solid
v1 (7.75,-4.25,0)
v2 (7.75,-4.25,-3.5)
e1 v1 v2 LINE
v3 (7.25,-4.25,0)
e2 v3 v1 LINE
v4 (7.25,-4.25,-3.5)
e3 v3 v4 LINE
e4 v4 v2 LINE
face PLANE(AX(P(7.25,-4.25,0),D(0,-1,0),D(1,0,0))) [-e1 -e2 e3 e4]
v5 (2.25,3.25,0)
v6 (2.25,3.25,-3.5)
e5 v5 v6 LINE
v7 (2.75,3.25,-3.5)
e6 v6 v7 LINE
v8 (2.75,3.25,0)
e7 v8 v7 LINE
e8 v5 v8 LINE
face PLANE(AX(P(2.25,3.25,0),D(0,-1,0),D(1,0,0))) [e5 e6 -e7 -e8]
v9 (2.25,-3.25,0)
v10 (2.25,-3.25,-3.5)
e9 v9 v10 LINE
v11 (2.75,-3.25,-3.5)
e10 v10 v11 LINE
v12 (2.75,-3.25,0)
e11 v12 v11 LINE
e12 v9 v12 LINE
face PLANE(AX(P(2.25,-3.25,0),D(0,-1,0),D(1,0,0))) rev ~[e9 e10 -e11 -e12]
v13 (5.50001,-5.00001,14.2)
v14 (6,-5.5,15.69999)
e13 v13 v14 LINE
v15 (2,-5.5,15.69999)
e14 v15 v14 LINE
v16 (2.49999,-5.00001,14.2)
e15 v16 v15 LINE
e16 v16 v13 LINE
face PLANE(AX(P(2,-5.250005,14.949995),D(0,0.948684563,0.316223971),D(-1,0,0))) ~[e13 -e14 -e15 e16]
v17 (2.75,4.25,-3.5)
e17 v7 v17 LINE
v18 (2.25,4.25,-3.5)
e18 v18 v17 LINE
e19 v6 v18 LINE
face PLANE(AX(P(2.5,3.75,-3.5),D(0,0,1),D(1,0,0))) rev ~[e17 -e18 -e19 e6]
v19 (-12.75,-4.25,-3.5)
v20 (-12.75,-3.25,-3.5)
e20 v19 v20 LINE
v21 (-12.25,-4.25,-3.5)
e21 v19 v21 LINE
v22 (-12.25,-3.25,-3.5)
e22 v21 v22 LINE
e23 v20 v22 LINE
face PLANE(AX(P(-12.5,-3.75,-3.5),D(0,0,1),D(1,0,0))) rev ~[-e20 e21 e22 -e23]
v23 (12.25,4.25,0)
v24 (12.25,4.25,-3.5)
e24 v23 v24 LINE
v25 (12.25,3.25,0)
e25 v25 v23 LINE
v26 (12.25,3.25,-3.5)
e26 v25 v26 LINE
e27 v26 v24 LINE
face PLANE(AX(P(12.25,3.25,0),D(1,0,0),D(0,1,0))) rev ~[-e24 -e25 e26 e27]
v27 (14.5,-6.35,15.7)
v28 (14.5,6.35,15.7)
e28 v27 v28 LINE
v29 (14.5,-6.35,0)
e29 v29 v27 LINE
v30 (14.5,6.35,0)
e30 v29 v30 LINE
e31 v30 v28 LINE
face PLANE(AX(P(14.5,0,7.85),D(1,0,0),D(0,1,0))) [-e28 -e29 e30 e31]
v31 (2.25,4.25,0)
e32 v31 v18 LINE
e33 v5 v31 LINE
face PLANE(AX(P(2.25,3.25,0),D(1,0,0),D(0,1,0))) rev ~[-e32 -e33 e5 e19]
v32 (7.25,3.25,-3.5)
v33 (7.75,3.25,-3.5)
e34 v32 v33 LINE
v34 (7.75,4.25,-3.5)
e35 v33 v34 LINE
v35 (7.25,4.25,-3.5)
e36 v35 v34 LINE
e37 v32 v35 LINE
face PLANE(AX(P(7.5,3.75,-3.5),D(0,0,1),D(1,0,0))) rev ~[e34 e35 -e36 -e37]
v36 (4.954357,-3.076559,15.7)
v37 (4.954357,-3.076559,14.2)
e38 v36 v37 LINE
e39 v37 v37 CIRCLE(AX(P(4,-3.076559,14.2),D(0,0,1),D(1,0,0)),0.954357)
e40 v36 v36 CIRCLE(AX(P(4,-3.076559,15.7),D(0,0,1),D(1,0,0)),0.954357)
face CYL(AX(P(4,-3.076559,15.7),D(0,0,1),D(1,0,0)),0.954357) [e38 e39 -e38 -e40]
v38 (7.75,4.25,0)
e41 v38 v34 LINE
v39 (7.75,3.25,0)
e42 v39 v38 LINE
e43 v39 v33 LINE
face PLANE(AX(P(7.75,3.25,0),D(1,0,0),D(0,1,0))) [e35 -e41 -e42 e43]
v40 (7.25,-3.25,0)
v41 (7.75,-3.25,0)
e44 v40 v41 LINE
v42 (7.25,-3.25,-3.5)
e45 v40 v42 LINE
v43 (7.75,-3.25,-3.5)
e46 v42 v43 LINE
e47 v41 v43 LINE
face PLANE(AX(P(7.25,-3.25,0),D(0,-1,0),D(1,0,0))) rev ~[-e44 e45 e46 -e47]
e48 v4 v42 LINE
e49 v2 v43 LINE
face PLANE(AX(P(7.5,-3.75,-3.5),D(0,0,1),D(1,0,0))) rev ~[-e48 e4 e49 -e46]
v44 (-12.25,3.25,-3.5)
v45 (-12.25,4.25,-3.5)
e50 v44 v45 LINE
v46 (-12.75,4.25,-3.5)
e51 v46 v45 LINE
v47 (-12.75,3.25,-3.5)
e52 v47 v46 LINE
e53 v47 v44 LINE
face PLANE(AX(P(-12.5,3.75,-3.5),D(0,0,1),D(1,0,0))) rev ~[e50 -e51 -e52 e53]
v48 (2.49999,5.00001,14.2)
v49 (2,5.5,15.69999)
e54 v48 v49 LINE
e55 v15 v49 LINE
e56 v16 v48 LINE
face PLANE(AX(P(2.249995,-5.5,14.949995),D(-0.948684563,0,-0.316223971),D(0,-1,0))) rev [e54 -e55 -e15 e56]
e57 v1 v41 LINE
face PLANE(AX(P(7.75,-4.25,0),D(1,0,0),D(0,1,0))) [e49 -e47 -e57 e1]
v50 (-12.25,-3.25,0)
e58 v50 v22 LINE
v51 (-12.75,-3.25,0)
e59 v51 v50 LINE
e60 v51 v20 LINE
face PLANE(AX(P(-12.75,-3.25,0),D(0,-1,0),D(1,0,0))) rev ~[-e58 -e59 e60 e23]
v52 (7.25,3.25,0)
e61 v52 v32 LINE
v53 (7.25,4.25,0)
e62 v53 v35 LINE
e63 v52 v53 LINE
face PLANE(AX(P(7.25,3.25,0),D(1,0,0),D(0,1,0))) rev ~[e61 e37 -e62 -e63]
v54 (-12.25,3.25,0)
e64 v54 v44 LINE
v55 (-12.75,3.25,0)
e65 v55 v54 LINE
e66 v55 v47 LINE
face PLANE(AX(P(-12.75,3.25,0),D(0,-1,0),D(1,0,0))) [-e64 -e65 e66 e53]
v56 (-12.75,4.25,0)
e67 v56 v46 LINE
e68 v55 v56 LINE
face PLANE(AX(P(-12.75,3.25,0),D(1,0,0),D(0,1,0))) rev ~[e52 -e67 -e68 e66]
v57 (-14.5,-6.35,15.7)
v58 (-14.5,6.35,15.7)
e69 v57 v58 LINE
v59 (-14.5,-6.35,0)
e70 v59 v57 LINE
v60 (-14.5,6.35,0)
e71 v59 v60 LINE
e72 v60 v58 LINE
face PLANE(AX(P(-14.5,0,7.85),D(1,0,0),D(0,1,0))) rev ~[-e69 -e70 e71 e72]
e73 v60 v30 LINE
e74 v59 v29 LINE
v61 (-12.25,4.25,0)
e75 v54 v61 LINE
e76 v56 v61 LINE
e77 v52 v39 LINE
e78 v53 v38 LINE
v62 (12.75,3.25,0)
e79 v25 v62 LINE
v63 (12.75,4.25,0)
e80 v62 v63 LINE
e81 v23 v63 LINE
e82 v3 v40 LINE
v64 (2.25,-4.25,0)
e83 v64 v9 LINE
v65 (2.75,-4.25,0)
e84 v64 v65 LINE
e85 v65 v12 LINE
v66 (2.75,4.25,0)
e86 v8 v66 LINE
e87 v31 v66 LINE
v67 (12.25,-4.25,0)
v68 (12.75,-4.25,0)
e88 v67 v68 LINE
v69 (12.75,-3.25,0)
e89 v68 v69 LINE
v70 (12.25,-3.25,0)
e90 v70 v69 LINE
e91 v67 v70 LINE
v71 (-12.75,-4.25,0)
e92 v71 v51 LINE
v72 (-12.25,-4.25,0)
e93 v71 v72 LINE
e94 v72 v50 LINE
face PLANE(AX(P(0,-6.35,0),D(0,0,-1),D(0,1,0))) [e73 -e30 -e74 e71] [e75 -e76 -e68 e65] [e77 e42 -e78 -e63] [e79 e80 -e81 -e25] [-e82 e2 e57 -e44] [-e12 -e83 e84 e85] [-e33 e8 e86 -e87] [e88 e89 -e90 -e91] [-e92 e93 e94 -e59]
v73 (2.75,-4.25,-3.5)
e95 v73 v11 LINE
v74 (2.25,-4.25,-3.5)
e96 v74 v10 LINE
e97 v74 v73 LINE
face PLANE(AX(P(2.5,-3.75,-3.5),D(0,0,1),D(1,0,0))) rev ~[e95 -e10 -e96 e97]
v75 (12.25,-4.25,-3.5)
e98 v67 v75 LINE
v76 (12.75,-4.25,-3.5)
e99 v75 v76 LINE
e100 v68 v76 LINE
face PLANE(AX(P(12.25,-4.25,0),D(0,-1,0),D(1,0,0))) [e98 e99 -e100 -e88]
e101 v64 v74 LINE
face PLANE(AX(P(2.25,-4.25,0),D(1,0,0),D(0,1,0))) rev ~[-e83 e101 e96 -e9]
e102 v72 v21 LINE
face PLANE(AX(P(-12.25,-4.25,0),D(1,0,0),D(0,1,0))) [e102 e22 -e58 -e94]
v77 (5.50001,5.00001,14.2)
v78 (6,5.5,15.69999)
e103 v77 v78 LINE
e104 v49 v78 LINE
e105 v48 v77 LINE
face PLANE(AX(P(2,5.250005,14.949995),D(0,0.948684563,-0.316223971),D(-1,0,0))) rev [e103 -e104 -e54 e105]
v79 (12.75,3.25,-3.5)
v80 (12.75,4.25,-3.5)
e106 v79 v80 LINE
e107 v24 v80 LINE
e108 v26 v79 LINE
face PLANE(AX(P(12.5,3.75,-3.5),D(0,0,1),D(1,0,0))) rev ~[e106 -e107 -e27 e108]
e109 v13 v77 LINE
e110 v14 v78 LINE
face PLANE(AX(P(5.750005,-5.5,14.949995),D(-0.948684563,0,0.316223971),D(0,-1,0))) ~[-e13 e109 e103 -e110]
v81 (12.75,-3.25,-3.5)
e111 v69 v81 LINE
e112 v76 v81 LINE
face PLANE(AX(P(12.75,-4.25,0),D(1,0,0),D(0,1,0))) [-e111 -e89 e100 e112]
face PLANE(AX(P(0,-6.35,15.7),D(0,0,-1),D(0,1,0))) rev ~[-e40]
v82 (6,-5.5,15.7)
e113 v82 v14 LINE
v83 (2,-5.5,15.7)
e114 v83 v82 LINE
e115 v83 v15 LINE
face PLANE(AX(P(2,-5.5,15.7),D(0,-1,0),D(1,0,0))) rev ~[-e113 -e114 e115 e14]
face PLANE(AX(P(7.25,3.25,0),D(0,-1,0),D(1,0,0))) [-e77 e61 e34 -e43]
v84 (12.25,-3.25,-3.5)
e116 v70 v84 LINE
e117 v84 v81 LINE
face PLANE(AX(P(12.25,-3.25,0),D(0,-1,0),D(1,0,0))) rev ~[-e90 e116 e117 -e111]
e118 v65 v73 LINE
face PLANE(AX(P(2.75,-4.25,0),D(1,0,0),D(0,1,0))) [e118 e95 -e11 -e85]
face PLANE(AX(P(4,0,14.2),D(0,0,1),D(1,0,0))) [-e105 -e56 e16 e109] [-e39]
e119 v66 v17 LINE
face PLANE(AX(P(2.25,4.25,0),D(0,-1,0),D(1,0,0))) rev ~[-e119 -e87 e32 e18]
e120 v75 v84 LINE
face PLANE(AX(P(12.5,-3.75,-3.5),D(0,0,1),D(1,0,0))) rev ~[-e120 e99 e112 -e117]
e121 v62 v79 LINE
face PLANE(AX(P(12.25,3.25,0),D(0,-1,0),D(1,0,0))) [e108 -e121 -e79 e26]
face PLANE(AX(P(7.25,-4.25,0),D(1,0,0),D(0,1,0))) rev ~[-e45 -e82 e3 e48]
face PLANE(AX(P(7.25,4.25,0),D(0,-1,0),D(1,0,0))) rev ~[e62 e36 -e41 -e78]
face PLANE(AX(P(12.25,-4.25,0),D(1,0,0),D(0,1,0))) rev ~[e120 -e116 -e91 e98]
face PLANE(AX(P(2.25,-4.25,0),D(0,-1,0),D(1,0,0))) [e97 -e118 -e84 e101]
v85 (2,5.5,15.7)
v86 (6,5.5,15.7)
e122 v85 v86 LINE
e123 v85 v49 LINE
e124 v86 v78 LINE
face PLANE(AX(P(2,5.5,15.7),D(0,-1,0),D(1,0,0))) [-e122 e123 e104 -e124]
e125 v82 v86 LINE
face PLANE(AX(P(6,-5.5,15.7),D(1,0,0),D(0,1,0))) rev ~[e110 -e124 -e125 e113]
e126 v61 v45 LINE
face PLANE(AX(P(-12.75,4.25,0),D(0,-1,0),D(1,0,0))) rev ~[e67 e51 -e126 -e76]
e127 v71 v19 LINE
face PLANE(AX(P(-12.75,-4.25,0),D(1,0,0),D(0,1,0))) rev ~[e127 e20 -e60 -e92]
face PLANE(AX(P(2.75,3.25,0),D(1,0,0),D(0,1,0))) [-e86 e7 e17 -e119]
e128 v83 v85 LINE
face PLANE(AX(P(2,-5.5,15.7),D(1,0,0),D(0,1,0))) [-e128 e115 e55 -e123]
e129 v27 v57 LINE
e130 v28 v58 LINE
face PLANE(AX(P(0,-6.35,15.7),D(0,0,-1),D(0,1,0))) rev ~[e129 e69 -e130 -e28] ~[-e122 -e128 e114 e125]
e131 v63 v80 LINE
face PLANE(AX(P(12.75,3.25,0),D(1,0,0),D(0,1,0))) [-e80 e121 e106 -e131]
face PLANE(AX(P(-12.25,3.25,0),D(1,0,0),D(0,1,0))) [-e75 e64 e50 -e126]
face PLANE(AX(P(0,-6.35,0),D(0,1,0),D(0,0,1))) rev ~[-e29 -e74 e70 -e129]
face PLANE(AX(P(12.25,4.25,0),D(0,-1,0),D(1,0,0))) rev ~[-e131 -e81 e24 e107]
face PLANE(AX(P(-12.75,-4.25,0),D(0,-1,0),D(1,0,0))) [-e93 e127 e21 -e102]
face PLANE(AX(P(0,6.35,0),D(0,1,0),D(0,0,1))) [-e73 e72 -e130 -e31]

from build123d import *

# Parameters (mm, degrees)
F0_W     = 12.7
F0_H     = 15.7
F1_DEPTH = 14.5
F2_W     = 0.5
F2_H     = 1
F3_DEPTH = 3.5
F4_W     = 4
F4_H     = 11
F4_R     = 0.9543570249
F5_DEPTH = 1.5
F6_SIZE2 = 1.49999
F6_SIZE  = 0.49999


# Not quite as in the source:
# - a fillet or chamfer is up to 0.001 mm smaller than in the source, because OpenCascade refuses the exact size


with BuildPart() as f1:
    # F0 (on Right) → F1 (new body, symmetric)
    with BuildSketch(Plane.YZ):
        with Locations((0, 7.85)):
            Rectangle(F0_W, F0_H)
    extrude(amount=F1_DEPTH, both=True)

    # F2 (on Top) → F3 (join)
    with BuildSketch(Plane.XY):
        with Locations((-12.5, 3.75)):
            Rectangle(F2_W, F2_H)
        with Locations((2.5, 3.75)):
            Rectangle(F2_W, F2_H)
        with Locations((7.5, 3.75)):
            Rectangle(F2_W, F2_H)
        with Locations((12.5, 3.75)):
            Rectangle(F2_W, F2_H)
        with Locations((2.5, -3.75)):
            Rectangle(F2_W, F2_H)
        with Locations((7.5, -3.75)):
            Rectangle(F2_W, F2_H)
        with Locations((12.5, -3.75)):
            Rectangle(F2_W, F2_H)
        with Locations((-12.5, -3.75)):
            Rectangle(F2_W, F2_H)
    extrude(amount=-F3_DEPTH)

    # F4 (on face) → F5 (cut)
    with BuildSketch(Plane.XY.offset(15.7)):
        with Locations((4, 0)):
            Rectangle(F4_W, F4_H)
        with Locations((4, -3.076559362)):
            Circle(F4_R, mode=Mode.SUBTRACT)
    extrude(amount=-F5_DEPTH, mode=Mode.SUBTRACT)

    # F6 (size 0.5 and 1.5 in the source; OpenCascade refuses exactly that, so slightly less here)
    f6_edges = [f1.edges().sort_by_distance(p)[0] for p in [
        (2, 0, 14.2),
        (4, 5.5, 14.2),
        (6, 0, 14.2),
        (4, -5.5, 14.2),
    ]]
    f6_side = f1.faces().sort_by_distance((4, 0.213987, 14.2))[0]
    chamfer(f6_edges, length=F6_SIZE, length2=F6_SIZE2, reference=f6_side)


solid = f1.part
